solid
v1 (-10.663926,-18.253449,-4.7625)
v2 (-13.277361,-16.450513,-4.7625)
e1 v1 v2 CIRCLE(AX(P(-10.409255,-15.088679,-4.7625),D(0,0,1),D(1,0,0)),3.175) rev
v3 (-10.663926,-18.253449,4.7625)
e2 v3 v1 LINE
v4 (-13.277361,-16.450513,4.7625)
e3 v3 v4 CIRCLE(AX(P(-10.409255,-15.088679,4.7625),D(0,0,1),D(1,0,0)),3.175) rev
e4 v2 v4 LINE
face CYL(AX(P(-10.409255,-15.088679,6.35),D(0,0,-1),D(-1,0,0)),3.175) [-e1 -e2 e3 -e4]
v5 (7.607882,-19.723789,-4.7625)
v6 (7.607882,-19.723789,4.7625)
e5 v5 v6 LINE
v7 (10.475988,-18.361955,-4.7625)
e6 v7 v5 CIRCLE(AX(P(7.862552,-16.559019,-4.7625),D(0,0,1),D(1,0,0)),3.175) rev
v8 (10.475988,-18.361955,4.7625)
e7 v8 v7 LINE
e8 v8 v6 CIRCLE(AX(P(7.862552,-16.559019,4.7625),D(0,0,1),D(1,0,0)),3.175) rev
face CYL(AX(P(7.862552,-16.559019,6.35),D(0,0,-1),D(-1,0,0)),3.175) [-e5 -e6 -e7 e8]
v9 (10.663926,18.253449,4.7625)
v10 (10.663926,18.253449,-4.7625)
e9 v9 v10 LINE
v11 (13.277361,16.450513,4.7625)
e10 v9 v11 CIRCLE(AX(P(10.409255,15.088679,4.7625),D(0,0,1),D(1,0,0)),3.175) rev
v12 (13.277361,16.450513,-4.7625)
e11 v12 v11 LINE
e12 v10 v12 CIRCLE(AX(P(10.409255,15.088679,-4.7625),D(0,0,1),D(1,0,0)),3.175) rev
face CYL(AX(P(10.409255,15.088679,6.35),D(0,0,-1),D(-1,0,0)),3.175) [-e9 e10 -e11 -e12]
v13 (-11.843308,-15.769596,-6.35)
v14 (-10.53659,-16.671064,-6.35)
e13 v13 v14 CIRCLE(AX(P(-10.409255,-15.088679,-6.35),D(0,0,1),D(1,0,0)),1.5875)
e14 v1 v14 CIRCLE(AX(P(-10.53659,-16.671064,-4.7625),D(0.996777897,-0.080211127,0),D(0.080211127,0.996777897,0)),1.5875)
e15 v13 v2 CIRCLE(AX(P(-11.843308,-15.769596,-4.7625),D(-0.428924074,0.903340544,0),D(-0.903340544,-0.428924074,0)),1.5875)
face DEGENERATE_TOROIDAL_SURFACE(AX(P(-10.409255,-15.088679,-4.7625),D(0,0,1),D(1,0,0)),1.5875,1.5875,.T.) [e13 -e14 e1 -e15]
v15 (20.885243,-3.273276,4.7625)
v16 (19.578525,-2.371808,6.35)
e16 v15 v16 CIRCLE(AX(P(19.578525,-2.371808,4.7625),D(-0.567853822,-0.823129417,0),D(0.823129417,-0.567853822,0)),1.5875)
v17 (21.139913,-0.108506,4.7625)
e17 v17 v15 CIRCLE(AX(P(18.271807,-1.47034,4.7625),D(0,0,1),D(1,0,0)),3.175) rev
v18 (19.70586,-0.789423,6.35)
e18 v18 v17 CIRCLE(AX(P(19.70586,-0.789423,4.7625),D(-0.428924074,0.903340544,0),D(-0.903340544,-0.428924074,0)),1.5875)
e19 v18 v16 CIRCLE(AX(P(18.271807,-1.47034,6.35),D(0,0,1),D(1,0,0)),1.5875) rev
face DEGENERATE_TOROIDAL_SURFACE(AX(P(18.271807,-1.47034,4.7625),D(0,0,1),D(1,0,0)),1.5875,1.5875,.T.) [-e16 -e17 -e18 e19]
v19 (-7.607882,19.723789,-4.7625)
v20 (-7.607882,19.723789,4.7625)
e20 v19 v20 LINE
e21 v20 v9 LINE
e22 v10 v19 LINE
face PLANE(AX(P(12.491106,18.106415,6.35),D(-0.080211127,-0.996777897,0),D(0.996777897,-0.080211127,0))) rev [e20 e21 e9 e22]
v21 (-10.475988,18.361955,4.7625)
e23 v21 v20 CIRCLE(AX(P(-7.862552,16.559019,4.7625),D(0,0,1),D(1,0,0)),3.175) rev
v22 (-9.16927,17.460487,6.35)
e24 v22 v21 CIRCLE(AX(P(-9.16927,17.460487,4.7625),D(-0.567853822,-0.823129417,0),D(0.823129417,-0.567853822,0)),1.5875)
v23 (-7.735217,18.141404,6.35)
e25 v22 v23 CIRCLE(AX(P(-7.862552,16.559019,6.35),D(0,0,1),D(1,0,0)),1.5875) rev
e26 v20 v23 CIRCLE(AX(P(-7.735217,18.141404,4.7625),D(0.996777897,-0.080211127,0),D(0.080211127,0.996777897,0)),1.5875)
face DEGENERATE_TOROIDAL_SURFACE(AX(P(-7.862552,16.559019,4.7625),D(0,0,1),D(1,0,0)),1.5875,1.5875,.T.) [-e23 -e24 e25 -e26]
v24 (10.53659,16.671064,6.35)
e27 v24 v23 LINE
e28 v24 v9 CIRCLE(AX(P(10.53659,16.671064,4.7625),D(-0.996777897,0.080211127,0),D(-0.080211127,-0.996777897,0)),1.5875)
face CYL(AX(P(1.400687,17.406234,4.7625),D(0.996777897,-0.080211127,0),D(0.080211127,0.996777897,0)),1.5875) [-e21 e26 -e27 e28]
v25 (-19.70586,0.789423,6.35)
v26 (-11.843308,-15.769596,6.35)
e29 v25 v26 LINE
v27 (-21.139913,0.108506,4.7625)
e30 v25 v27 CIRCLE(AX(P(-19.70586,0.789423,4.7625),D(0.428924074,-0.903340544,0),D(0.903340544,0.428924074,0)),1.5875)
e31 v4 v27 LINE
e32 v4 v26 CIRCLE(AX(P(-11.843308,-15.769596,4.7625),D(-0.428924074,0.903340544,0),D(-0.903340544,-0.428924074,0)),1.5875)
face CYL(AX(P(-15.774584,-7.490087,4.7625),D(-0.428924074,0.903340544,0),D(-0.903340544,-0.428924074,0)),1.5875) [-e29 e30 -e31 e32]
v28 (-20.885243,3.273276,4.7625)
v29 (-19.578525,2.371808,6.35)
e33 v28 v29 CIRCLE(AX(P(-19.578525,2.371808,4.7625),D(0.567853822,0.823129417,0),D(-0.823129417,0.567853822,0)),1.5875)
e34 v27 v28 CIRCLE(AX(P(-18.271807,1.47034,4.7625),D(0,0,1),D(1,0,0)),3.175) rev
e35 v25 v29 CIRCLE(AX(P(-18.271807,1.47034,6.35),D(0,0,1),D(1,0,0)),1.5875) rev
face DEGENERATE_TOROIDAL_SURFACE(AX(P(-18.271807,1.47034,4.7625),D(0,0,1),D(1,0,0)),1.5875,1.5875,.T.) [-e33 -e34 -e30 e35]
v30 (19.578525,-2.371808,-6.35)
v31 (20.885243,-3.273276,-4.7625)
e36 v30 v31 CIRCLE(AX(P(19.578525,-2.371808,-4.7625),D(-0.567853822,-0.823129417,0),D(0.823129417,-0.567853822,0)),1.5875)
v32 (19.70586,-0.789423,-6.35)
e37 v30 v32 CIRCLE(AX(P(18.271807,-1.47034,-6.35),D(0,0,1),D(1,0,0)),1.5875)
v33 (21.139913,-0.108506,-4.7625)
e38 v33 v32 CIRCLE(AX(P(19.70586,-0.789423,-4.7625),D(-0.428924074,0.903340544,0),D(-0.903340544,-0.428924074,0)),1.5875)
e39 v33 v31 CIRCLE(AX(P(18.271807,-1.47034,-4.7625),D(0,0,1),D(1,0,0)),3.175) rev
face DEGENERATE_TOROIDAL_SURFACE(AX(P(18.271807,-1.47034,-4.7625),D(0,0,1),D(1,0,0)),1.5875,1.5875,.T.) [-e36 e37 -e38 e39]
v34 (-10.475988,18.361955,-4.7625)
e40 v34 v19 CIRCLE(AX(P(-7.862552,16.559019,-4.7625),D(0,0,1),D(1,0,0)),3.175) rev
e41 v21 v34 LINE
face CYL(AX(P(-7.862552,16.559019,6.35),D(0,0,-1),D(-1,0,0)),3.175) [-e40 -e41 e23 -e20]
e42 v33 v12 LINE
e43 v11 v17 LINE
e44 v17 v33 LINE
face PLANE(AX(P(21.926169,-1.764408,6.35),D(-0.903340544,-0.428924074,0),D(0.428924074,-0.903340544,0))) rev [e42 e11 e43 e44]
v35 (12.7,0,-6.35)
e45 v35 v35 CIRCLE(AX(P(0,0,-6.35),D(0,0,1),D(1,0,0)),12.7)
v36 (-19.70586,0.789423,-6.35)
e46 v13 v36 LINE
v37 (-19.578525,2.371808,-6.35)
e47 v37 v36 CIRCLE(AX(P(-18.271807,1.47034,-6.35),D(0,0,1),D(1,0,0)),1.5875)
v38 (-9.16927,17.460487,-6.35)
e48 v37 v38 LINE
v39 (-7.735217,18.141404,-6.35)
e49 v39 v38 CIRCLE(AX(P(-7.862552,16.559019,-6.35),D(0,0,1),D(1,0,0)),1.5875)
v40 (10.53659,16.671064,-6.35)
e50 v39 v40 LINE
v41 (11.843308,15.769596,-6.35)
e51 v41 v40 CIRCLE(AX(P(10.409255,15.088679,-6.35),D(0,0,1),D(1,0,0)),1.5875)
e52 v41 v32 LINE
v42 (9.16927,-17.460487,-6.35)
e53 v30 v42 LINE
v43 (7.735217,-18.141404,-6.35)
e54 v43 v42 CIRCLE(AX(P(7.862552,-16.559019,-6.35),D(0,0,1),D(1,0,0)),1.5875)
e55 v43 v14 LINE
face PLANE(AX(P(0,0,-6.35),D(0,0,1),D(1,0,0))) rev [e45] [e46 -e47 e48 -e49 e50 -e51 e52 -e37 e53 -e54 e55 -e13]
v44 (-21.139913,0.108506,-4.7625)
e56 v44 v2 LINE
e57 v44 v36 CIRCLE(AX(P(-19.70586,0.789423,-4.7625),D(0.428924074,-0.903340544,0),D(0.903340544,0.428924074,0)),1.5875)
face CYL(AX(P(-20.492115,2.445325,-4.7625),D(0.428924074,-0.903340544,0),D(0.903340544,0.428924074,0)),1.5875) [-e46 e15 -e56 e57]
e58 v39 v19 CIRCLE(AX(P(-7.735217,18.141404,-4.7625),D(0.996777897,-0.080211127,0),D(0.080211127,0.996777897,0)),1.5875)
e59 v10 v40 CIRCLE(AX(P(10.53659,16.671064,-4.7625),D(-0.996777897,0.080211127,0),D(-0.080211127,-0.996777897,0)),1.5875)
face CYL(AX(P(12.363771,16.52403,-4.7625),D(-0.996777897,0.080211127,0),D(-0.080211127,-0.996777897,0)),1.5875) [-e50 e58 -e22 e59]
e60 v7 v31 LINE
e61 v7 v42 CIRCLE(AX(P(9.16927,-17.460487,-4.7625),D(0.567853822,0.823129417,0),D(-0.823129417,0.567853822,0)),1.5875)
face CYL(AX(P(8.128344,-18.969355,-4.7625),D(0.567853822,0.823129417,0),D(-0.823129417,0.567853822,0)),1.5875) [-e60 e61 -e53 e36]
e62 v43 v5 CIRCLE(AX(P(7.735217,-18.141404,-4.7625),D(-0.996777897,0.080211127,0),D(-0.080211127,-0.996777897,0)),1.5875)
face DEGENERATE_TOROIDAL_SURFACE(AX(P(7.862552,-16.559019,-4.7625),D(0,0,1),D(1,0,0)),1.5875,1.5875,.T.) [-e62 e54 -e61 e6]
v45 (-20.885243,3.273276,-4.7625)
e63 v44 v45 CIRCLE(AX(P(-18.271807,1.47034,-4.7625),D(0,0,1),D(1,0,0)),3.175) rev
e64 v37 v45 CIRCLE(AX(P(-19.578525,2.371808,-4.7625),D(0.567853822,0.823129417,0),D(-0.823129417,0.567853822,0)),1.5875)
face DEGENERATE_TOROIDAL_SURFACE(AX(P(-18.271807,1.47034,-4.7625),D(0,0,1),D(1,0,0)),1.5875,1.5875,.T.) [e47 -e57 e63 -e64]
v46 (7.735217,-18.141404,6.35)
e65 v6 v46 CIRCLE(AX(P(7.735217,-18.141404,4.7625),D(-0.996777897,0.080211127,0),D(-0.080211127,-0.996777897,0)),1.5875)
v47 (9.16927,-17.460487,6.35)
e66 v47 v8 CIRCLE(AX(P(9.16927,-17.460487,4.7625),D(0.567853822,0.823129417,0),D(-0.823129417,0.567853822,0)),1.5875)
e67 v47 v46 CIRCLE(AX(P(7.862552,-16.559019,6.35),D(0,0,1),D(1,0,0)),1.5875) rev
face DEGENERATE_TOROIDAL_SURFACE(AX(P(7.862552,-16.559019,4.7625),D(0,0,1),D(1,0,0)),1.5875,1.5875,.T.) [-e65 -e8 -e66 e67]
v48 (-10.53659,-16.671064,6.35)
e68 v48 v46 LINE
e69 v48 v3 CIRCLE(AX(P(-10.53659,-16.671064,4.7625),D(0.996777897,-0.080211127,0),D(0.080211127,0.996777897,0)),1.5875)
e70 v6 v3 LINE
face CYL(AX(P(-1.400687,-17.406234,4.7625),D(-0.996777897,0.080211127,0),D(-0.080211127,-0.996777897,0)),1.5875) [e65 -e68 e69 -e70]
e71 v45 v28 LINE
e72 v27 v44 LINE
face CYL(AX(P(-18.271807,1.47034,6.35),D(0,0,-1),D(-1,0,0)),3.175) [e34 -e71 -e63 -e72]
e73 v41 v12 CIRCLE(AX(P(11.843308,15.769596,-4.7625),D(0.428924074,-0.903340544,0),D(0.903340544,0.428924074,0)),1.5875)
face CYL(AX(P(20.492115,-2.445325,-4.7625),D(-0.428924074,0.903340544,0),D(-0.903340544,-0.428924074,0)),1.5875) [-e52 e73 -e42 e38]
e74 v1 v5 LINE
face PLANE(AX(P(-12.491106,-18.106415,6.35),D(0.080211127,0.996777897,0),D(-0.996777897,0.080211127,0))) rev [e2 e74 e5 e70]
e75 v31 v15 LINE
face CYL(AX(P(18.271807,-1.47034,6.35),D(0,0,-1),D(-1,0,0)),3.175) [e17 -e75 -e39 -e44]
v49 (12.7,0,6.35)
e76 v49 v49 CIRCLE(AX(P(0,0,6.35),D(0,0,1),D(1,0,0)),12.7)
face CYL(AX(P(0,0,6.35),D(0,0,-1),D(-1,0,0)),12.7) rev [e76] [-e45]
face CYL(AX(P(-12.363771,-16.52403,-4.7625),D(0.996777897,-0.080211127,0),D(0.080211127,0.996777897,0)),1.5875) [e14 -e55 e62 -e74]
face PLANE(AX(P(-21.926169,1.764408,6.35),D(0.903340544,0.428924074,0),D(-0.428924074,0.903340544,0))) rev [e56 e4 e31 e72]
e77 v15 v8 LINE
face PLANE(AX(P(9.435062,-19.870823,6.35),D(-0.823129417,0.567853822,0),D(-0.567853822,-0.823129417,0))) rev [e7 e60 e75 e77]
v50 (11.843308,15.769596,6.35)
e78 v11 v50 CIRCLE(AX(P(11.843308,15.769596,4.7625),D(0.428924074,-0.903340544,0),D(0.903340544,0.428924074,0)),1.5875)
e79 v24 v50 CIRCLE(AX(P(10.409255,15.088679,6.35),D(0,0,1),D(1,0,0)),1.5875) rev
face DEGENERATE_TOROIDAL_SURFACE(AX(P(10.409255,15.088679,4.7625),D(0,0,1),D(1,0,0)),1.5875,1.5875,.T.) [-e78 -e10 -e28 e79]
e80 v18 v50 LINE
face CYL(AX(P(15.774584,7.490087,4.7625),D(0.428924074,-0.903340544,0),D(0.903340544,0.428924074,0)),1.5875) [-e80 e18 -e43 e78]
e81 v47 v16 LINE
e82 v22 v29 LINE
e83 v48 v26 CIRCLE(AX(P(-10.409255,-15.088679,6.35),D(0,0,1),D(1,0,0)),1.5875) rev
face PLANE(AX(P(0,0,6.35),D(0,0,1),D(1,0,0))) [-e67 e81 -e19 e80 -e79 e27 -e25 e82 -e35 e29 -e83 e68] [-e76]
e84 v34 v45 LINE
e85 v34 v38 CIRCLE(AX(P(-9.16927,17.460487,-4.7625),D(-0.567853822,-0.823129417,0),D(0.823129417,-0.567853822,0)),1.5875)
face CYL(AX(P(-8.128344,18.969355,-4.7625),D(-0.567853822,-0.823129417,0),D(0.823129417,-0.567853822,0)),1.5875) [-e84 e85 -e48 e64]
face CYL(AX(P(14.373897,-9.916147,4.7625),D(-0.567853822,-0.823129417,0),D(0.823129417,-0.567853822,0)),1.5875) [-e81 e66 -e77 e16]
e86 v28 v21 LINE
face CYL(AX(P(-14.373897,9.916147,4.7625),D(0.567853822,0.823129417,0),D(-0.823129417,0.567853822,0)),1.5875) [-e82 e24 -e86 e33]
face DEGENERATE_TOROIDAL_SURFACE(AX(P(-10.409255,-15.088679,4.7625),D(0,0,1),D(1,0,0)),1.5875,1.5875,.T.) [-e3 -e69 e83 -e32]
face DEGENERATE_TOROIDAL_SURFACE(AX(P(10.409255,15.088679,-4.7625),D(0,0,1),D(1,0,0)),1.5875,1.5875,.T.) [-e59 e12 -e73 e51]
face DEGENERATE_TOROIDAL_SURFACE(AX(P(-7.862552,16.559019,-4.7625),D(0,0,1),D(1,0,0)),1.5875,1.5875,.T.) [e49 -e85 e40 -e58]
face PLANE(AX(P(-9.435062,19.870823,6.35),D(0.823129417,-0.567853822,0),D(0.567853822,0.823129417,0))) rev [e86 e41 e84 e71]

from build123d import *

# Parameters (mm, degrees)
SKETCH1_R           = 12.7
BOSS_EXTRUDE1_DEPTH = 6.35
FILLET1_R           = 1.5875
FILLET2_R           = 3.175


with BuildPart() as part:
    # Sketch1 → Boss-Extrude1 (new, symmetric)
    with BuildSketch(Plane.XY):
        Polygon((-9.43506227631135, 19.870822827505833), (-21.92616850087544, 1.7644077961790767), (-12.491106224564081, -18.10641503132676), (9.43506227631137, -19.870822827505812), (21.926168500875455, -1.764407796179048), (12.491106224564096, 18.10641503132678), align=None)
        Circle(SKETCH1_R, mode=Mode.SUBTRACT)
    extrude(amount=BOSS_EXTRUDE1_DEPTH, both=True)

    # Fillet1
    fillet1_edges = [part.edges().sort_by_distance(p)[0] for p in [
        (-17.208637362719763, -8.17100361757384, 6.35),
        (-1.5280219741263554, -18.988618929416283, 6.35),
        (15.680615388593413, -10.81761531184243, 6.35),
        (17.208637362719777, 8.171003617573865, 6.35),
        (1.5280219741263732, 18.988618929416305, 6.35),
        (17.208637362719777, 8.171003617573865, -6.35),
        (15.680615388593413, -10.81761531184243, -6.35),
        (-1.5280219741263554, -18.988618929416283, -6.35),
        (-17.208637362719763, -8.17100361757384, -6.35),
        (-15.680615388593395, 10.817615311842456, -6.35),
        (1.5280219741263732, 18.988618929416305, -6.35),
        (-15.680615388593395, 10.817615311842456, 6.35),
    ]]
    fillet(fillet1_edges, radius=FILLET1_R)

    # Fillet2
    # the kernel refuses this fillet: 3.175 mm, written as the material it takes off along each edge
    with BuildSketch(Plane(origin=(-7.862551896926124, 16.559019022921532, -6.35), x_dir=(-0.8231294167240627, 0.5678538221439602, 0), z_dir=(-0.5678538221439602, -0.8231294167240627, 0))) as fillet2_piece_1:
        with BuildLine():
            CenterArc((1.5875, -1.5875), 1.5875, 0, 90)
            Line((3.175, -1.5875), (3.175, 0))
            Line((3.175, 0), (1.5875, 0))
        make_face()
    revolve(axis=Axis((-7.862551896926124, 16.559019022921532, -6.35), (0, 0, -1)), revolution_arc=59.999999999999986, mode=Mode.SUBTRACT)
    with BuildSketch(Plane(origin=(10.409255187136749, 15.088679192772318, -6.35), x_dir=(0.08021112725072843, 0.996777896557286, 0), z_dir=(-0.996777896557286, 0.08021112725072843, 0))) as fillet2_piece_2:
        with BuildLine():
            CenterArc((1.5875, -1.5875), 1.5875, 0, 90)
            Line((3.175, -1.5875), (3.175, 0))
            Line((3.175, 0), (1.5875, 0))
        make_face()
    revolve(axis=Axis((10.409255187136749, 15.088679192772318, -6.35), (0, 0, -1)), revolution_arc=59.99999999999997, mode=Mode.SUBTRACT)
    with BuildSketch(Plane(origin=(-18.271807084062868, 1.470339830149234, -6.35), x_dir=(-0.9033405439747911, -0.4289240744133263, 0), z_dir=(0.4289240744133263, -0.9033405439747911, 0))) as fillet2_piece_3:
        with BuildLine():
            CenterArc((1.5875, -1.5875), 1.5875, 0, 90)
            Line((3.175, -1.5875), (3.175, 0))
            Line((3.175, 0), (1.5875, 0))
        make_face()
    revolve(axis=Axis((-18.271807084062868, 1.470339830149234, -6.35), (0, 0, -1)), revolution_arc=60.000000000000036, mode=Mode.SUBTRACT)
    with BuildSketch(Plane(origin=(18.27180708406288, -1.4703398301492088, -6.35), x_dir=(0.903340543974791, 0.4289240744133264, 0), z_dir=(-0.4289240744133264, 0.903340543974791, 0))) as fillet2_piece_4:
        with BuildLine():
            CenterArc((1.5875, -1.5875), 1.5875, 0, 90)
            Line((3.175, -1.5875), (3.175, 0))
            Line((3.175, 0), (1.5875, 0))
        make_face()
    revolve(axis=Axis((18.27180708406288, -1.4703398301492088, -6.35), (0, 0, -1)), revolution_arc=60.00000000000001, mode=Mode.SUBTRACT)
    with BuildSketch(Plane(origin=(-10.40925518713673, -15.0886791927723, -6.35), x_dir=(-0.0802111272507284, -0.996777896557286, 0), z_dir=(0.996777896557286, -0.0802111272507284, 0))) as fillet2_piece_5:
        with BuildLine():
            CenterArc((1.5875, -1.5875), 1.5875, 0, 90)
            Line((3.175, -1.5875), (3.175, 0))
            Line((3.175, 0), (1.5875, 0))
        make_face()
    revolve(axis=Axis((-10.40925518713673, -15.0886791927723, -6.35), (0, 0, -1)), revolution_arc=59.99999999999997, mode=Mode.SUBTRACT)
    with BuildSketch(Plane(origin=(7.862551896926148, -16.559019022921508, -6.35), x_dir=(0.823129416724063, -0.5678538221439597, 0), z_dir=(0.5678538221439597, 0.823129416724063, 0))) as fillet2_piece_6:
        with BuildLine():
            CenterArc((1.5875, -1.5875), 1.5875, 0, 90)
            Line((3.175, -1.5875), (3.175, 0))
            Line((3.175, 0), (1.5875, 0))
        make_face()
    revolve(axis=Axis((7.862551896926148, -16.559019022921508, -6.35), (0, 0, -1)), revolution_arc=60.00000000000002, mode=Mode.SUBTRACT)
    with BuildSketch(Plane(origin=(7.862551896926148, -16.559019022921508, 6.35), x_dir=(-0.0802111272507284, -0.996777896557286, 0), z_dir=(-0.996777896557286, 0.0802111272507284, 0))) as fillet2_piece_7:
        with BuildLine():
            CenterArc((1.5875, -1.5875), 1.5875, 0, 90)
            Line((3.175, -1.5875), (3.175, 0))
            Line((3.175, 0), (1.5875, 0))
        make_face()
    revolve(axis=Axis((7.862551896926148, -16.559019022921508, 6.35), (0, 0, 1)), revolution_arc=60.00000000000002, mode=Mode.SUBTRACT)
    with BuildSketch(Plane(origin=(-10.40925518713673, -15.0886791927723, 6.35), x_dir=(-0.9033405439747911, -0.4289240744133263, 0), z_dir=(-0.4289240744133263, 0.9033405439747911, 0))) as fillet2_piece_8:
        with BuildLine():
            CenterArc((1.5875, -1.5875), 1.5875, 0, 90)
            Line((3.175, -1.5875), (3.175, 0))
            Line((3.175, 0), (1.5875, 0))
        make_face()
    revolve(axis=Axis((-10.40925518713673, -15.0886791927723, 6.35), (0, 0, 1)), revolution_arc=59.99999999999997, mode=Mode.SUBTRACT)
    with BuildSketch(Plane(origin=(18.27180708406288, -1.4703398301492088, 6.35), x_dir=(0.823129416724063, -0.5678538221439597, 0), z_dir=(-0.5678538221439597, -0.823129416724063, 0))) as fillet2_piece_9:
        with BuildLine():
            CenterArc((1.5875, -1.5875), 1.5875, 0, 90)
            Line((3.175, -1.5875), (3.175, 0))
            Line((3.175, 0), (1.5875, 0))
        make_face()
    revolve(axis=Axis((18.27180708406288, -1.4703398301492088, 6.35), (0, 0, 1)), revolution_arc=60.00000000000001, mode=Mode.SUBTRACT)
    with BuildSketch(Plane(origin=(-18.271807084062868, 1.470339830149234, 6.35), x_dir=(-0.8231294167240627, 0.5678538221439602, 0), z_dir=(0.5678538221439602, 0.8231294167240627, 0))) as fillet2_piece_10:
        with BuildLine():
            CenterArc((1.5875, -1.5875), 1.5875, 0, 90)
            Line((3.175, -1.5875), (3.175, 0))
            Line((3.175, 0), (1.5875, 0))
        make_face()
    revolve(axis=Axis((-18.271807084062868, 1.470339830149234, 6.35), (0, 0, 1)), revolution_arc=60.000000000000036, mode=Mode.SUBTRACT)
    with BuildSketch(Plane(origin=(10.409255187136749, 15.088679192772318, 6.35), x_dir=(0.903340543974791, 0.4289240744133264, 0), z_dir=(0.4289240744133264, -0.903340543974791, 0))) as fillet2_piece_11:
        with BuildLine():
            CenterArc((1.5875, -1.5875), 1.5875, 0, 90)
            Line((3.175, -1.5875), (3.175, 0))
            Line((3.175, 0), (1.5875, 0))
        make_face()
    revolve(axis=Axis((10.409255187136749, 15.088679192772318, 6.35), (0, 0, 1)), revolution_arc=59.99999999999997, mode=Mode.SUBTRACT)
    with BuildSketch(Plane(origin=(-7.862551896926124, 16.559019022921532, 6.35), x_dir=(0.08021112725072843, 0.996777896557286, 0), z_dir=(0.996777896557286, -0.08021112725072843, 0))) as fillet2_piece_12:
        with BuildLine():
            CenterArc((1.5875, -1.5875), 1.5875, 0, 90)
            Line((3.175, -1.5875), (3.175, 0))
            Line((3.175, 0), (1.5875, 0))
        make_face()
    revolve(axis=Axis((-7.862551896926124, 16.559019022921532, 6.35), (0, 0, 1)), revolution_arc=59.999999999999986, mode=Mode.SUBTRACT)
    with BuildSketch(Plane(origin=(9.43506227631137, -19.870822827505812, -6.35), x_dir=(-0.9967778965572859, 0.08021112725072867, 0), z_dir=(0, 0, 1))) as fillet2_piece_13:
        with BuildLine():
            CenterArc((FILLET2_R * 0.57735026919, -FILLET2_R), FILLET2_R, 90.00000000000003, 60)
            Line((-FILLET2_R * 0.288675134595, -FILLET2_R * 0.5), (0, 0))
            Line((0, 0), (FILLET2_R * 0.57735026919, -3e-17))
        make_face()
    extrude(amount=12.7, mode=Mode.SUBTRACT)
    with BuildSketch(Plane(origin=(-12.491106224564081, -18.106415031326755, -6.35), x_dir=(-0.4289240744133256, 0.9033405439747914, 0), z_dir=(0, 0, 1))) as fillet2_piece_14:
        with BuildLine():
            CenterArc((FILLET2_R * 0.57735026919, -FILLET2_R), FILLET2_R, 90.00000000000006, 59.99999999999994)
            Line((-FILLET2_R * 0.288675134595, -FILLET2_R * 0.5), (0, 0))
            Line((0, 0), (FILLET2_R * 0.57735026919, -1.1e-16))
        make_face()
    extrude(amount=12.7, mode=Mode.SUBTRACT)
    with BuildSketch(Plane(origin=(-21.92616850087544, 1.764407796179075, -6.350000000000001), x_dir=(0.5678538221439581, 0.8231294167240641, 0), z_dir=(0, 0, 1))) as fillet2_piece_15:
        with BuildLine():
            CenterArc((FILLET2_R * 0.57735026919, -FILLET2_R), FILLET2_R, 89.99999999999986, 60.000000000000114)
            Line((-FILLET2_R * 0.288675134595, -FILLET2_R * 0.5), (0, 0))
            Line((0, 0), (FILLET2_R * 0.57735026919, 0))
        make_face()
    extrude(amount=12.700000000000001, mode=Mode.SUBTRACT)
    with BuildSketch(Plane(origin=(-9.43506227631135, 19.870822827505833, 6.35), x_dir=(-0.5678538221439603, -0.8231294167240626, 0), z_dir=(0, 0, -1))) as fillet2_piece_16:
        with BuildLine():
            CenterArc((FILLET2_R * 0.57735026919, -FILLET2_R), FILLET2_R, 89.99999999999997, 59.99999999999997)
            Line((-FILLET2_R * 0.288675134595, -FILLET2_R * 0.5), (0, 0))
            Line((0, 0), (FILLET2_R * 0.57735026919, 0))
        make_face()
    extrude(amount=12.7, mode=Mode.SUBTRACT)
    with BuildSketch(Plane(origin=(12.491106224564094, 18.10641503132678, 6.350000000000001), x_dir=(-0.9967778965572859, 0.0802111272507286, 0), z_dir=(0, 0, -1))) as fillet2_piece_17:
        with BuildLine():
            CenterArc((FILLET2_R * 0.57735026919, -FILLET2_R), FILLET2_R, 89.99999999999997, 59.99999999999994)
            Line((-FILLET2_R * 0.288675134595, -FILLET2_R * 0.5), (0, 0))
            Line((0, 0), (FILLET2_R * 0.57735026919, 0))
        make_face()
    extrude(amount=12.700000000000001, mode=Mode.SUBTRACT)
    with BuildSketch(Plane(origin=(21.926168500875455, -1.7644077961790465, 6.35), x_dir=(-0.42892407441332714, 0.9033405439747906, 0), z_dir=(0, 0, -1))) as fillet2_piece_18:
        with BuildLine():
            CenterArc((FILLET2_R * 0.57735026919, -FILLET2_R), FILLET2_R, 90.00000000000007, 59.999999999999986)
            Line((-FILLET2_R * 0.288675134595, -FILLET2_R * 0.5), (0, 0))
            Line((0, 0), (FILLET2_R * 0.57735026919, 0))
        make_face()
    extrude(amount=12.7, mode=Mode.SUBTRACT)


solid = part.part
